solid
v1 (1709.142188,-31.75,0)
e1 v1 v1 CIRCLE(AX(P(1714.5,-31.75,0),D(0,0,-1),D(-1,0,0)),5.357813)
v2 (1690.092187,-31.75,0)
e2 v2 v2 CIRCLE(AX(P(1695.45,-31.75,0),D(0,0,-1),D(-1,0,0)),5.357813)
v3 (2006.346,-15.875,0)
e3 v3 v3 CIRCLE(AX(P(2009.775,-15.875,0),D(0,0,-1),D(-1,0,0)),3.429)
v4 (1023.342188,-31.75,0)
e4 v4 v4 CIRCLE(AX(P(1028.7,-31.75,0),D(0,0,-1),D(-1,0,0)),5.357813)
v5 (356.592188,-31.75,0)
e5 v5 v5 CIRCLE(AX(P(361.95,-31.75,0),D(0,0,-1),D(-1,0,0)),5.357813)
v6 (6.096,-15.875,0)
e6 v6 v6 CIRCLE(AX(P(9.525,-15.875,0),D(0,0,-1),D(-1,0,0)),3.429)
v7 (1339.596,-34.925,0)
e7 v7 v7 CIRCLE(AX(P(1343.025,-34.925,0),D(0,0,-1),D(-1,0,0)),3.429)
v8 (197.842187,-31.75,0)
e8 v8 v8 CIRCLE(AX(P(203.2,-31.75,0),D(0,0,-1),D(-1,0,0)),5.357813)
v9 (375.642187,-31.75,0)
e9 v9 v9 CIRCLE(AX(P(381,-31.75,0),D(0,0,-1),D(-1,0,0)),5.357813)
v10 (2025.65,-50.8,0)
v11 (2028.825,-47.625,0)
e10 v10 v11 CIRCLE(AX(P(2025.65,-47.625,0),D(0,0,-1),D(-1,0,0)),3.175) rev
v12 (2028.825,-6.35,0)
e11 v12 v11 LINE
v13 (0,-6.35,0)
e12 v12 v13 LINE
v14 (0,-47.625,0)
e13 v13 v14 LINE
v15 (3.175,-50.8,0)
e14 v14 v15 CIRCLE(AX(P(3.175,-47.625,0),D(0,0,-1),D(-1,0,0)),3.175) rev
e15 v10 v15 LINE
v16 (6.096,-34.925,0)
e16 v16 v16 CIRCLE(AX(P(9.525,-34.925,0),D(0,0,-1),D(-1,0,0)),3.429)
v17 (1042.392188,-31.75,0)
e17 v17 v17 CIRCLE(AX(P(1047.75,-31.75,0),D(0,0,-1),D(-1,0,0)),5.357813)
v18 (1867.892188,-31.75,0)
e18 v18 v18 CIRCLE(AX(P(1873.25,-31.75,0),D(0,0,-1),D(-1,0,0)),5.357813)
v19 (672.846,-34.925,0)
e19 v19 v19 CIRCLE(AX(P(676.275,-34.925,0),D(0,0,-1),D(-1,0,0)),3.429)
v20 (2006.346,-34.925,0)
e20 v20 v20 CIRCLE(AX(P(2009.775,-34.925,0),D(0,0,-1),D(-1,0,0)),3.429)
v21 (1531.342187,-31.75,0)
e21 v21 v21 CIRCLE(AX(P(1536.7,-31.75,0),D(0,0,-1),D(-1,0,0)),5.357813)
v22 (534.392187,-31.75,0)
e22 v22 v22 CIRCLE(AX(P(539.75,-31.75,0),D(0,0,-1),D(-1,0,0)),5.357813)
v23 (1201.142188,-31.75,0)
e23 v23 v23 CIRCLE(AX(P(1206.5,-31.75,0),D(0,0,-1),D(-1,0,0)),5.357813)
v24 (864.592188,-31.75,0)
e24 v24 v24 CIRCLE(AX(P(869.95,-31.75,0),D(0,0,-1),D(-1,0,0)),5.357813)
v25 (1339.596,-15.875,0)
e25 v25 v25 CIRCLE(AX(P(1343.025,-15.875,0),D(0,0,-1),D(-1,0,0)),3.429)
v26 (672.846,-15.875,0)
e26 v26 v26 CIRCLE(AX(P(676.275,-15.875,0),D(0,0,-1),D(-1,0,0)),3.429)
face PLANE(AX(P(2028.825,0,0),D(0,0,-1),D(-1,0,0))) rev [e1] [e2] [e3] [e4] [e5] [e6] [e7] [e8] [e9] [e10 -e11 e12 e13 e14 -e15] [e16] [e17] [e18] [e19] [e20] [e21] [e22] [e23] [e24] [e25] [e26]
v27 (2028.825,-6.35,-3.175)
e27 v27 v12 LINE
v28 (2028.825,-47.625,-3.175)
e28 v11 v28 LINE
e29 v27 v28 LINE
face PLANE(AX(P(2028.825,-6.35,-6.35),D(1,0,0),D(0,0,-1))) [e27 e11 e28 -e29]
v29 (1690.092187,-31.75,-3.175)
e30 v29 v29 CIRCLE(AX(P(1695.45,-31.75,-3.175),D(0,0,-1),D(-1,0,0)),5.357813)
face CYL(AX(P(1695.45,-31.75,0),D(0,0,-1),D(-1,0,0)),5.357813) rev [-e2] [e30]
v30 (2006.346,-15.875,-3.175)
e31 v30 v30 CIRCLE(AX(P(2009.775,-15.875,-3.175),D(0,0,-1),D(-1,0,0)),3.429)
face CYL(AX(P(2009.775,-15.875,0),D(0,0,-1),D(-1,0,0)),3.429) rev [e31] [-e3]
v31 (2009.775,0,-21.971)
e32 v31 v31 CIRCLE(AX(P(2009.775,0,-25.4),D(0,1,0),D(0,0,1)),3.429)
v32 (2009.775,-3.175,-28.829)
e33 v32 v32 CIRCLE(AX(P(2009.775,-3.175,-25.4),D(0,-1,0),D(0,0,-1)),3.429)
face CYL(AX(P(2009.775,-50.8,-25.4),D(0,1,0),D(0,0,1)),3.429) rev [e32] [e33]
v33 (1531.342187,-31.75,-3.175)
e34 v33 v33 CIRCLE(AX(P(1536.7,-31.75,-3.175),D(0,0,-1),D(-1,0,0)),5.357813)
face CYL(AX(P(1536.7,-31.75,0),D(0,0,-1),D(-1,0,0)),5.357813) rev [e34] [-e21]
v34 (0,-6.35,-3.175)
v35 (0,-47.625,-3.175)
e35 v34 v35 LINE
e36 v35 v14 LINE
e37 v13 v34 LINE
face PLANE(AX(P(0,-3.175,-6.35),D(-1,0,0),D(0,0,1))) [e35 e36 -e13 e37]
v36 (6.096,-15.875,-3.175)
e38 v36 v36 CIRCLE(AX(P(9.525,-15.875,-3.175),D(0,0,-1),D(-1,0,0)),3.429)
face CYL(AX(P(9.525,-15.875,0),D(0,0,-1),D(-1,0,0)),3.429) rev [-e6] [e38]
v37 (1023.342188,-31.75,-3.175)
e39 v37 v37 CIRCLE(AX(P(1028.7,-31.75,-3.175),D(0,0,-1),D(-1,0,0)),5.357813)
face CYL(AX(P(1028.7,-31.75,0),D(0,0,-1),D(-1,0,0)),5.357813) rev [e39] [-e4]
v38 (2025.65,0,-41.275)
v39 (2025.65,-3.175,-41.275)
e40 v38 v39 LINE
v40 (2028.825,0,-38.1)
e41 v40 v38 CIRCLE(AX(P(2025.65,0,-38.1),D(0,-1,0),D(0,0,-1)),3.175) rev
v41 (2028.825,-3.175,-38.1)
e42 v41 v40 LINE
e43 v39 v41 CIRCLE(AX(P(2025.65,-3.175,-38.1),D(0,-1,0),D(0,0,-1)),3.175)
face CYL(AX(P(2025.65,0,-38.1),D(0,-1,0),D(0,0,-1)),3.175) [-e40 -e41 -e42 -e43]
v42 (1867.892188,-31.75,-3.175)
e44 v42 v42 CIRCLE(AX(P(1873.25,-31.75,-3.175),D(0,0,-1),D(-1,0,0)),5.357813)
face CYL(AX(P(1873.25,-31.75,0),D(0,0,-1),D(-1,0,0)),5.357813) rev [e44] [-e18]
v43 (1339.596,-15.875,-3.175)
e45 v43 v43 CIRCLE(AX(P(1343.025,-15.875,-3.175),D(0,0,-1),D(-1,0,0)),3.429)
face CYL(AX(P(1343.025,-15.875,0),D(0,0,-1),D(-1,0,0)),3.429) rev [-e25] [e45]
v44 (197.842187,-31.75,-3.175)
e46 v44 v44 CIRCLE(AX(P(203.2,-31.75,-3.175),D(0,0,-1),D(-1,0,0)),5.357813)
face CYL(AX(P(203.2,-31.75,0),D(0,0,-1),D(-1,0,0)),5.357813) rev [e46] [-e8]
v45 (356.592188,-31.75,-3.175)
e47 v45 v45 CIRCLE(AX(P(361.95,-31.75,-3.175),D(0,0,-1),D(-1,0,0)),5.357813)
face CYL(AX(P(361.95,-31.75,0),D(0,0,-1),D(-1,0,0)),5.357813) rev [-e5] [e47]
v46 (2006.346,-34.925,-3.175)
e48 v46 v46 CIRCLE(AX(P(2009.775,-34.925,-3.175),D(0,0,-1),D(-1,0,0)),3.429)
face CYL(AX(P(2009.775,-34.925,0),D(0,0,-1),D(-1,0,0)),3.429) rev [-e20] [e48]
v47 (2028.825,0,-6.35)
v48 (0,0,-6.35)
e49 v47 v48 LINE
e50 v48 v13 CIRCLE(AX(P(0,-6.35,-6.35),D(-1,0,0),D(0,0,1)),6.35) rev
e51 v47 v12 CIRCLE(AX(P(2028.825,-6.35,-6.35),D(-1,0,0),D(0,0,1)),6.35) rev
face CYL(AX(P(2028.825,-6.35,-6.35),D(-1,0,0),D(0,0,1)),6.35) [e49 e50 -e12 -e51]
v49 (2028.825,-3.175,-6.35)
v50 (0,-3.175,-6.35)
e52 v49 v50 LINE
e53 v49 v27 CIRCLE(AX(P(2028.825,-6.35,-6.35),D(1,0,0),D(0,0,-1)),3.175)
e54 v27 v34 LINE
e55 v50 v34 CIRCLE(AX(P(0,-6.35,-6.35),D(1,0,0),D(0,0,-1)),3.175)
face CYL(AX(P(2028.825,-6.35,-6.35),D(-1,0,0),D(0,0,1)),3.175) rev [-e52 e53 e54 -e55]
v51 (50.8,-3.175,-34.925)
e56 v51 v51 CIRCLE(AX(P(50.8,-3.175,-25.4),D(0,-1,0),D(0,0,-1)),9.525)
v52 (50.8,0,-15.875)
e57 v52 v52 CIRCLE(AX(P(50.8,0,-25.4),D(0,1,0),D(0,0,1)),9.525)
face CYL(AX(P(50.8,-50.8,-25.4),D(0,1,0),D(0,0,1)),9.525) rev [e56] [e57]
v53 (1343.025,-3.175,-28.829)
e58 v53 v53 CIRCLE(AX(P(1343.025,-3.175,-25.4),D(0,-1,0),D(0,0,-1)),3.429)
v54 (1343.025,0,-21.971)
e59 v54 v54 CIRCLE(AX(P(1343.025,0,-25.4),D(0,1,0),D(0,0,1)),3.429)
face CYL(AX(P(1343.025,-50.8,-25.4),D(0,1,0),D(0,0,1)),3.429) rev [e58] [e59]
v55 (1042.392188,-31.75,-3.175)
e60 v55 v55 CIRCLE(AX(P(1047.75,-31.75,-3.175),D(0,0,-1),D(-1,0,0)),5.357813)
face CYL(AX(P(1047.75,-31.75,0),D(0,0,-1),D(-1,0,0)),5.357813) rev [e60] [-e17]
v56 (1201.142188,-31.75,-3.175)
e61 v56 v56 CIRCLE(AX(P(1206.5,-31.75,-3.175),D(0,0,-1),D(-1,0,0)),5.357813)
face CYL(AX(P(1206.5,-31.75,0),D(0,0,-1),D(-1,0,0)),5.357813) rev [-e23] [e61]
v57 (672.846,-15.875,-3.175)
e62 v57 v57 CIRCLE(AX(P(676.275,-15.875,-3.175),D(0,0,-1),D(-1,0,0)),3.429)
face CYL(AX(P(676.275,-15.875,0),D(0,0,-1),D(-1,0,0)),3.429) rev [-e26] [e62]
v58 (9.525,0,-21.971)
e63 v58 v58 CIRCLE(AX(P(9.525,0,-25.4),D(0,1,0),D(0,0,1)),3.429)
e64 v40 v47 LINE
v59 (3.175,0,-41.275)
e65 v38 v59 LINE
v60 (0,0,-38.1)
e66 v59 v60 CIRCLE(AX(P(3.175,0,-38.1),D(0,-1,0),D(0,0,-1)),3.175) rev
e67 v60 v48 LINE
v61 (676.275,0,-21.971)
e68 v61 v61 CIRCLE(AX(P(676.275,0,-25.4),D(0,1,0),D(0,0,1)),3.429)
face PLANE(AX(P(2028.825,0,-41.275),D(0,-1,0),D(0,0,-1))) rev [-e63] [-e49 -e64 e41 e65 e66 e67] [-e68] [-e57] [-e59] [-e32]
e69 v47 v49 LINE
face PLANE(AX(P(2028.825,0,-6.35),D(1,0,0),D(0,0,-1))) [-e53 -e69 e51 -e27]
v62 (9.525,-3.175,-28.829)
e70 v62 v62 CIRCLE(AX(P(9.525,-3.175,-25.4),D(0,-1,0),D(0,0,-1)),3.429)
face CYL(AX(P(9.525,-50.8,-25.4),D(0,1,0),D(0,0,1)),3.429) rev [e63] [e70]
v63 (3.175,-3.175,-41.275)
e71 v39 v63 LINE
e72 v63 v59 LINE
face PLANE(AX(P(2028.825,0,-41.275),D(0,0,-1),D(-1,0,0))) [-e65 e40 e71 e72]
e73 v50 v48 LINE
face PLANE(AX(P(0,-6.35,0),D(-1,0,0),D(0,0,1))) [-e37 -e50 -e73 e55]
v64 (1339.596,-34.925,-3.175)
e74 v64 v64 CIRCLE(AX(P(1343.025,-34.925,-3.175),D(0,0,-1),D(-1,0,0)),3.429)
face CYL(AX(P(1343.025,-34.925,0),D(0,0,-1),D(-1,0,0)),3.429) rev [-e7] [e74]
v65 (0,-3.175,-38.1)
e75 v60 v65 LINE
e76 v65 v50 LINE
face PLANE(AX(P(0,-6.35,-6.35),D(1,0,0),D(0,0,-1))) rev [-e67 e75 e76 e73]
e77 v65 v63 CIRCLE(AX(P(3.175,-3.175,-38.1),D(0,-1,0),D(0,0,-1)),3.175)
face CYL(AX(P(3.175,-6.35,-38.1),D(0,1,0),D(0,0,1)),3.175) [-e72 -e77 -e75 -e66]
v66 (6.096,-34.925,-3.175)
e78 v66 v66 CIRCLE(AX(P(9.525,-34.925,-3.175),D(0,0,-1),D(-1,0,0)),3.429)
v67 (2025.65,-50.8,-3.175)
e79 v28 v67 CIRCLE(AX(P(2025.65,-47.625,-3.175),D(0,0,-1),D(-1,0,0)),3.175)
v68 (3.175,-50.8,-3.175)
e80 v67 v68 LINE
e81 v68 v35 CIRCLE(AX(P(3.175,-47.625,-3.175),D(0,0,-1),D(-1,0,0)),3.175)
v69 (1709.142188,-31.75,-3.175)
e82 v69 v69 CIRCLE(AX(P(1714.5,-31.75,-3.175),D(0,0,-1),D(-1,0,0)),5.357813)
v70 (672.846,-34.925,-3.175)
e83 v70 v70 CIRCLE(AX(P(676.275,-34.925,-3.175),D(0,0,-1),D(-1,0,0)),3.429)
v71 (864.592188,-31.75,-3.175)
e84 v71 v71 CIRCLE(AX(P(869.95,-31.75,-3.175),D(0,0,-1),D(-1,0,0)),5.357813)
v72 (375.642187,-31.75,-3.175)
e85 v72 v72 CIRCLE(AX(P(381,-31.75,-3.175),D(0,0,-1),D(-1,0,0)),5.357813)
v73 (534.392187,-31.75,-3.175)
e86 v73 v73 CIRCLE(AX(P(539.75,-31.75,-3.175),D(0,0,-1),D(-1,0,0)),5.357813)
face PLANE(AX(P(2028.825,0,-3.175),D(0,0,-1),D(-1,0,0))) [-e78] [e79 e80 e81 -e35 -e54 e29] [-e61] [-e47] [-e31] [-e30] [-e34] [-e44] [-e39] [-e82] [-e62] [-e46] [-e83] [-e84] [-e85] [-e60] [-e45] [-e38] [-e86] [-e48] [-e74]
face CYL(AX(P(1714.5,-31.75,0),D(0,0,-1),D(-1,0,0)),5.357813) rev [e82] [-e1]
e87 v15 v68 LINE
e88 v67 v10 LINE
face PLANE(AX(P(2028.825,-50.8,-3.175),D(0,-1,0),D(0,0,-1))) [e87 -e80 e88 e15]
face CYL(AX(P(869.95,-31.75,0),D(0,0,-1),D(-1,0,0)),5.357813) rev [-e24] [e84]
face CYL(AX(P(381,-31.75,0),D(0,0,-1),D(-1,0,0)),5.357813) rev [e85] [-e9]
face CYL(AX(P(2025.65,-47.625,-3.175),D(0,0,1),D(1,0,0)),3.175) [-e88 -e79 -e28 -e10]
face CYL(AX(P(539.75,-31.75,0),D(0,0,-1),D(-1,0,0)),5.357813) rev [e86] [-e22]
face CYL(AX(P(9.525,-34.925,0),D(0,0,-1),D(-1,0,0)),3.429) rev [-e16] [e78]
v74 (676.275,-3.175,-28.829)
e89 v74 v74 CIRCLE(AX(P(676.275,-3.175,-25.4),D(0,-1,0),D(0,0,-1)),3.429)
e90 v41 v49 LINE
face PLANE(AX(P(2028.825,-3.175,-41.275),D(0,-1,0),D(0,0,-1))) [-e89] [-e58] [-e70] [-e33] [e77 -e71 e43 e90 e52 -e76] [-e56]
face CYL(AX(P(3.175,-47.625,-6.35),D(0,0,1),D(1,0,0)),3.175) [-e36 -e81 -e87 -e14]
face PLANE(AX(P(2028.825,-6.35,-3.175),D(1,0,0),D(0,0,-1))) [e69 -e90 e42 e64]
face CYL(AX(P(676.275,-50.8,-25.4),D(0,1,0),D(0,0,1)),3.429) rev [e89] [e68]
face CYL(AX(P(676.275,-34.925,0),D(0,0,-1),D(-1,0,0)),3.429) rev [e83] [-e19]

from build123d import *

# Parameters (mm, degrees)
BASE_FLANGE1_DEPTH = 2028.825
SKETCH2_R          = 5.3578125
SKETCH2_R_2        = 3.429
CUT_EXTRUDE1_DEPTH = 2030.818496966
SKETCH3_R          = 3.429
SKETCH3_R_2        = 9.525
CUT_EXTRUDE2_DEPTH = 2030.880574381
FILLET1_R          = 3.175


# Sheet-metal steps are written as plain solids
with BuildPart() as part:
    # Sketch1 → Base-Flange1 (new body)
    with BuildSketch(Plane(origin=(0, 0, 0), x_dir=(0, 0, -1), z_dir=(1, 0, 0))):
        with BuildLine():
            Line((41.275, 0), (6.35, 0))
            ThreePointArc((6.35, 0), (1.859871939, -1.859871939), (0, -6.35))
            Line((0, -6.35), (0, -50.8))
            Line((0, -50.8), (3.175, -50.8))
            Line((3.175, -50.8), (3.175, -6.35))
            ThreePointArc((3.175, -6.35), (4.10493597, -4.10493597), (6.35, -3.175))
            Line((6.35, -3.175), (41.275, -3.175))
            Line((41.275, -3.175), (41.275, 0))
        make_face()
    extrude(amount=BASE_FLANGE1_DEPTH)

    # Sketch2 → Cut-Extrude1 (cut, through all)
    with BuildSketch(Plane(origin=(0, 0, -3.175), x_dir=(-1, 0, 0), z_dir=(0, 0, -1))):
        with Locations((-1873.25, -31.75)):
            Circle(SKETCH2_R)
        with Locations((-1714.5, -31.75)):
            Circle(SKETCH2_R)
        with Locations((-1695.45, -31.75)):
            Circle(SKETCH2_R)
        with Locations((-1536.7, -31.75)):
            Circle(SKETCH2_R)
        with Locations((-1206.5, -31.75)):
            Circle(SKETCH2_R)
        with Locations((-1047.75, -31.75)):
            Circle(SKETCH2_R)
        with Locations((-1028.7, -31.75)):
            Circle(SKETCH2_R)
        with Locations((-869.95, -31.75)):
            Circle(SKETCH2_R)
        with Locations((-539.75, -31.75)):
            Circle(SKETCH2_R)
        with Locations((-381, -31.75)):
            Circle(SKETCH2_R)
        with Locations((-361.95, -31.75)):
            Circle(SKETCH2_R)
        with Locations((-203.2, -31.75)):
            Circle(SKETCH2_R)
        with Locations((-9.525, -15.875)):
            Circle(SKETCH2_R_2)
        with Locations((-9.525, -34.925)):
            Circle(SKETCH2_R_2)
        with Locations((-676.275, -34.925)):
            Circle(SKETCH2_R_2)
        with Locations((-676.275, -15.875)):
            Circle(SKETCH2_R_2)
        with Locations((-1343.025, -34.925)):
            Circle(SKETCH2_R_2)
        with Locations((-1343.025, -15.875)):
            Circle(SKETCH2_R_2)
        with Locations((-2009.775, -34.925)):
            Circle(SKETCH2_R_2)
        with Locations((-2009.775, -15.875)):
            Circle(SKETCH2_R_2)
    extrude(amount=-CUT_EXTRUDE1_DEPTH, mode=Mode.SUBTRACT)

    # Sketch3 → Cut-Extrude2 (cut, through all)
    with BuildSketch(Plane(origin=(0, 0, 0), x_dir=(1, 0, 0), z_dir=(0, 1, 0))):
        with Locations(Location((2009.775, 25.4, 0), (0, 0, 270))):
            Circle(SKETCH3_R)
        with Locations(Location((1343.025, 25.4, 0), (0, 0, 270))):
            Circle(SKETCH3_R)
        with Locations(Location((676.275, 25.4, 0), (0, 0, 270))):
            Circle(SKETCH3_R)
        with Locations(Location((9.525, 25.4, 0), (0, 0, 270))):
            Circle(SKETCH3_R)
        with Locations(Location((50.8, 25.4, 0), (0, 0, 270))):
            Circle(SKETCH3_R_2)
    extrude(amount=-CUT_EXTRUDE2_DEPTH, mode=Mode.SUBTRACT)

    # Fillet1
    fillet1_edges = [part.edges().sort_by_distance(p)[0] for p in [
        (2028.825, -1.5875, -41.275),
        (0, -1.5875, -41.275),
        (2028.825, -50.8, -1.5875),
        (0, -50.8, -1.5875),
    ]]
    fillet(fillet1_edges, radius=FILLET1_R)


solid = part.part
